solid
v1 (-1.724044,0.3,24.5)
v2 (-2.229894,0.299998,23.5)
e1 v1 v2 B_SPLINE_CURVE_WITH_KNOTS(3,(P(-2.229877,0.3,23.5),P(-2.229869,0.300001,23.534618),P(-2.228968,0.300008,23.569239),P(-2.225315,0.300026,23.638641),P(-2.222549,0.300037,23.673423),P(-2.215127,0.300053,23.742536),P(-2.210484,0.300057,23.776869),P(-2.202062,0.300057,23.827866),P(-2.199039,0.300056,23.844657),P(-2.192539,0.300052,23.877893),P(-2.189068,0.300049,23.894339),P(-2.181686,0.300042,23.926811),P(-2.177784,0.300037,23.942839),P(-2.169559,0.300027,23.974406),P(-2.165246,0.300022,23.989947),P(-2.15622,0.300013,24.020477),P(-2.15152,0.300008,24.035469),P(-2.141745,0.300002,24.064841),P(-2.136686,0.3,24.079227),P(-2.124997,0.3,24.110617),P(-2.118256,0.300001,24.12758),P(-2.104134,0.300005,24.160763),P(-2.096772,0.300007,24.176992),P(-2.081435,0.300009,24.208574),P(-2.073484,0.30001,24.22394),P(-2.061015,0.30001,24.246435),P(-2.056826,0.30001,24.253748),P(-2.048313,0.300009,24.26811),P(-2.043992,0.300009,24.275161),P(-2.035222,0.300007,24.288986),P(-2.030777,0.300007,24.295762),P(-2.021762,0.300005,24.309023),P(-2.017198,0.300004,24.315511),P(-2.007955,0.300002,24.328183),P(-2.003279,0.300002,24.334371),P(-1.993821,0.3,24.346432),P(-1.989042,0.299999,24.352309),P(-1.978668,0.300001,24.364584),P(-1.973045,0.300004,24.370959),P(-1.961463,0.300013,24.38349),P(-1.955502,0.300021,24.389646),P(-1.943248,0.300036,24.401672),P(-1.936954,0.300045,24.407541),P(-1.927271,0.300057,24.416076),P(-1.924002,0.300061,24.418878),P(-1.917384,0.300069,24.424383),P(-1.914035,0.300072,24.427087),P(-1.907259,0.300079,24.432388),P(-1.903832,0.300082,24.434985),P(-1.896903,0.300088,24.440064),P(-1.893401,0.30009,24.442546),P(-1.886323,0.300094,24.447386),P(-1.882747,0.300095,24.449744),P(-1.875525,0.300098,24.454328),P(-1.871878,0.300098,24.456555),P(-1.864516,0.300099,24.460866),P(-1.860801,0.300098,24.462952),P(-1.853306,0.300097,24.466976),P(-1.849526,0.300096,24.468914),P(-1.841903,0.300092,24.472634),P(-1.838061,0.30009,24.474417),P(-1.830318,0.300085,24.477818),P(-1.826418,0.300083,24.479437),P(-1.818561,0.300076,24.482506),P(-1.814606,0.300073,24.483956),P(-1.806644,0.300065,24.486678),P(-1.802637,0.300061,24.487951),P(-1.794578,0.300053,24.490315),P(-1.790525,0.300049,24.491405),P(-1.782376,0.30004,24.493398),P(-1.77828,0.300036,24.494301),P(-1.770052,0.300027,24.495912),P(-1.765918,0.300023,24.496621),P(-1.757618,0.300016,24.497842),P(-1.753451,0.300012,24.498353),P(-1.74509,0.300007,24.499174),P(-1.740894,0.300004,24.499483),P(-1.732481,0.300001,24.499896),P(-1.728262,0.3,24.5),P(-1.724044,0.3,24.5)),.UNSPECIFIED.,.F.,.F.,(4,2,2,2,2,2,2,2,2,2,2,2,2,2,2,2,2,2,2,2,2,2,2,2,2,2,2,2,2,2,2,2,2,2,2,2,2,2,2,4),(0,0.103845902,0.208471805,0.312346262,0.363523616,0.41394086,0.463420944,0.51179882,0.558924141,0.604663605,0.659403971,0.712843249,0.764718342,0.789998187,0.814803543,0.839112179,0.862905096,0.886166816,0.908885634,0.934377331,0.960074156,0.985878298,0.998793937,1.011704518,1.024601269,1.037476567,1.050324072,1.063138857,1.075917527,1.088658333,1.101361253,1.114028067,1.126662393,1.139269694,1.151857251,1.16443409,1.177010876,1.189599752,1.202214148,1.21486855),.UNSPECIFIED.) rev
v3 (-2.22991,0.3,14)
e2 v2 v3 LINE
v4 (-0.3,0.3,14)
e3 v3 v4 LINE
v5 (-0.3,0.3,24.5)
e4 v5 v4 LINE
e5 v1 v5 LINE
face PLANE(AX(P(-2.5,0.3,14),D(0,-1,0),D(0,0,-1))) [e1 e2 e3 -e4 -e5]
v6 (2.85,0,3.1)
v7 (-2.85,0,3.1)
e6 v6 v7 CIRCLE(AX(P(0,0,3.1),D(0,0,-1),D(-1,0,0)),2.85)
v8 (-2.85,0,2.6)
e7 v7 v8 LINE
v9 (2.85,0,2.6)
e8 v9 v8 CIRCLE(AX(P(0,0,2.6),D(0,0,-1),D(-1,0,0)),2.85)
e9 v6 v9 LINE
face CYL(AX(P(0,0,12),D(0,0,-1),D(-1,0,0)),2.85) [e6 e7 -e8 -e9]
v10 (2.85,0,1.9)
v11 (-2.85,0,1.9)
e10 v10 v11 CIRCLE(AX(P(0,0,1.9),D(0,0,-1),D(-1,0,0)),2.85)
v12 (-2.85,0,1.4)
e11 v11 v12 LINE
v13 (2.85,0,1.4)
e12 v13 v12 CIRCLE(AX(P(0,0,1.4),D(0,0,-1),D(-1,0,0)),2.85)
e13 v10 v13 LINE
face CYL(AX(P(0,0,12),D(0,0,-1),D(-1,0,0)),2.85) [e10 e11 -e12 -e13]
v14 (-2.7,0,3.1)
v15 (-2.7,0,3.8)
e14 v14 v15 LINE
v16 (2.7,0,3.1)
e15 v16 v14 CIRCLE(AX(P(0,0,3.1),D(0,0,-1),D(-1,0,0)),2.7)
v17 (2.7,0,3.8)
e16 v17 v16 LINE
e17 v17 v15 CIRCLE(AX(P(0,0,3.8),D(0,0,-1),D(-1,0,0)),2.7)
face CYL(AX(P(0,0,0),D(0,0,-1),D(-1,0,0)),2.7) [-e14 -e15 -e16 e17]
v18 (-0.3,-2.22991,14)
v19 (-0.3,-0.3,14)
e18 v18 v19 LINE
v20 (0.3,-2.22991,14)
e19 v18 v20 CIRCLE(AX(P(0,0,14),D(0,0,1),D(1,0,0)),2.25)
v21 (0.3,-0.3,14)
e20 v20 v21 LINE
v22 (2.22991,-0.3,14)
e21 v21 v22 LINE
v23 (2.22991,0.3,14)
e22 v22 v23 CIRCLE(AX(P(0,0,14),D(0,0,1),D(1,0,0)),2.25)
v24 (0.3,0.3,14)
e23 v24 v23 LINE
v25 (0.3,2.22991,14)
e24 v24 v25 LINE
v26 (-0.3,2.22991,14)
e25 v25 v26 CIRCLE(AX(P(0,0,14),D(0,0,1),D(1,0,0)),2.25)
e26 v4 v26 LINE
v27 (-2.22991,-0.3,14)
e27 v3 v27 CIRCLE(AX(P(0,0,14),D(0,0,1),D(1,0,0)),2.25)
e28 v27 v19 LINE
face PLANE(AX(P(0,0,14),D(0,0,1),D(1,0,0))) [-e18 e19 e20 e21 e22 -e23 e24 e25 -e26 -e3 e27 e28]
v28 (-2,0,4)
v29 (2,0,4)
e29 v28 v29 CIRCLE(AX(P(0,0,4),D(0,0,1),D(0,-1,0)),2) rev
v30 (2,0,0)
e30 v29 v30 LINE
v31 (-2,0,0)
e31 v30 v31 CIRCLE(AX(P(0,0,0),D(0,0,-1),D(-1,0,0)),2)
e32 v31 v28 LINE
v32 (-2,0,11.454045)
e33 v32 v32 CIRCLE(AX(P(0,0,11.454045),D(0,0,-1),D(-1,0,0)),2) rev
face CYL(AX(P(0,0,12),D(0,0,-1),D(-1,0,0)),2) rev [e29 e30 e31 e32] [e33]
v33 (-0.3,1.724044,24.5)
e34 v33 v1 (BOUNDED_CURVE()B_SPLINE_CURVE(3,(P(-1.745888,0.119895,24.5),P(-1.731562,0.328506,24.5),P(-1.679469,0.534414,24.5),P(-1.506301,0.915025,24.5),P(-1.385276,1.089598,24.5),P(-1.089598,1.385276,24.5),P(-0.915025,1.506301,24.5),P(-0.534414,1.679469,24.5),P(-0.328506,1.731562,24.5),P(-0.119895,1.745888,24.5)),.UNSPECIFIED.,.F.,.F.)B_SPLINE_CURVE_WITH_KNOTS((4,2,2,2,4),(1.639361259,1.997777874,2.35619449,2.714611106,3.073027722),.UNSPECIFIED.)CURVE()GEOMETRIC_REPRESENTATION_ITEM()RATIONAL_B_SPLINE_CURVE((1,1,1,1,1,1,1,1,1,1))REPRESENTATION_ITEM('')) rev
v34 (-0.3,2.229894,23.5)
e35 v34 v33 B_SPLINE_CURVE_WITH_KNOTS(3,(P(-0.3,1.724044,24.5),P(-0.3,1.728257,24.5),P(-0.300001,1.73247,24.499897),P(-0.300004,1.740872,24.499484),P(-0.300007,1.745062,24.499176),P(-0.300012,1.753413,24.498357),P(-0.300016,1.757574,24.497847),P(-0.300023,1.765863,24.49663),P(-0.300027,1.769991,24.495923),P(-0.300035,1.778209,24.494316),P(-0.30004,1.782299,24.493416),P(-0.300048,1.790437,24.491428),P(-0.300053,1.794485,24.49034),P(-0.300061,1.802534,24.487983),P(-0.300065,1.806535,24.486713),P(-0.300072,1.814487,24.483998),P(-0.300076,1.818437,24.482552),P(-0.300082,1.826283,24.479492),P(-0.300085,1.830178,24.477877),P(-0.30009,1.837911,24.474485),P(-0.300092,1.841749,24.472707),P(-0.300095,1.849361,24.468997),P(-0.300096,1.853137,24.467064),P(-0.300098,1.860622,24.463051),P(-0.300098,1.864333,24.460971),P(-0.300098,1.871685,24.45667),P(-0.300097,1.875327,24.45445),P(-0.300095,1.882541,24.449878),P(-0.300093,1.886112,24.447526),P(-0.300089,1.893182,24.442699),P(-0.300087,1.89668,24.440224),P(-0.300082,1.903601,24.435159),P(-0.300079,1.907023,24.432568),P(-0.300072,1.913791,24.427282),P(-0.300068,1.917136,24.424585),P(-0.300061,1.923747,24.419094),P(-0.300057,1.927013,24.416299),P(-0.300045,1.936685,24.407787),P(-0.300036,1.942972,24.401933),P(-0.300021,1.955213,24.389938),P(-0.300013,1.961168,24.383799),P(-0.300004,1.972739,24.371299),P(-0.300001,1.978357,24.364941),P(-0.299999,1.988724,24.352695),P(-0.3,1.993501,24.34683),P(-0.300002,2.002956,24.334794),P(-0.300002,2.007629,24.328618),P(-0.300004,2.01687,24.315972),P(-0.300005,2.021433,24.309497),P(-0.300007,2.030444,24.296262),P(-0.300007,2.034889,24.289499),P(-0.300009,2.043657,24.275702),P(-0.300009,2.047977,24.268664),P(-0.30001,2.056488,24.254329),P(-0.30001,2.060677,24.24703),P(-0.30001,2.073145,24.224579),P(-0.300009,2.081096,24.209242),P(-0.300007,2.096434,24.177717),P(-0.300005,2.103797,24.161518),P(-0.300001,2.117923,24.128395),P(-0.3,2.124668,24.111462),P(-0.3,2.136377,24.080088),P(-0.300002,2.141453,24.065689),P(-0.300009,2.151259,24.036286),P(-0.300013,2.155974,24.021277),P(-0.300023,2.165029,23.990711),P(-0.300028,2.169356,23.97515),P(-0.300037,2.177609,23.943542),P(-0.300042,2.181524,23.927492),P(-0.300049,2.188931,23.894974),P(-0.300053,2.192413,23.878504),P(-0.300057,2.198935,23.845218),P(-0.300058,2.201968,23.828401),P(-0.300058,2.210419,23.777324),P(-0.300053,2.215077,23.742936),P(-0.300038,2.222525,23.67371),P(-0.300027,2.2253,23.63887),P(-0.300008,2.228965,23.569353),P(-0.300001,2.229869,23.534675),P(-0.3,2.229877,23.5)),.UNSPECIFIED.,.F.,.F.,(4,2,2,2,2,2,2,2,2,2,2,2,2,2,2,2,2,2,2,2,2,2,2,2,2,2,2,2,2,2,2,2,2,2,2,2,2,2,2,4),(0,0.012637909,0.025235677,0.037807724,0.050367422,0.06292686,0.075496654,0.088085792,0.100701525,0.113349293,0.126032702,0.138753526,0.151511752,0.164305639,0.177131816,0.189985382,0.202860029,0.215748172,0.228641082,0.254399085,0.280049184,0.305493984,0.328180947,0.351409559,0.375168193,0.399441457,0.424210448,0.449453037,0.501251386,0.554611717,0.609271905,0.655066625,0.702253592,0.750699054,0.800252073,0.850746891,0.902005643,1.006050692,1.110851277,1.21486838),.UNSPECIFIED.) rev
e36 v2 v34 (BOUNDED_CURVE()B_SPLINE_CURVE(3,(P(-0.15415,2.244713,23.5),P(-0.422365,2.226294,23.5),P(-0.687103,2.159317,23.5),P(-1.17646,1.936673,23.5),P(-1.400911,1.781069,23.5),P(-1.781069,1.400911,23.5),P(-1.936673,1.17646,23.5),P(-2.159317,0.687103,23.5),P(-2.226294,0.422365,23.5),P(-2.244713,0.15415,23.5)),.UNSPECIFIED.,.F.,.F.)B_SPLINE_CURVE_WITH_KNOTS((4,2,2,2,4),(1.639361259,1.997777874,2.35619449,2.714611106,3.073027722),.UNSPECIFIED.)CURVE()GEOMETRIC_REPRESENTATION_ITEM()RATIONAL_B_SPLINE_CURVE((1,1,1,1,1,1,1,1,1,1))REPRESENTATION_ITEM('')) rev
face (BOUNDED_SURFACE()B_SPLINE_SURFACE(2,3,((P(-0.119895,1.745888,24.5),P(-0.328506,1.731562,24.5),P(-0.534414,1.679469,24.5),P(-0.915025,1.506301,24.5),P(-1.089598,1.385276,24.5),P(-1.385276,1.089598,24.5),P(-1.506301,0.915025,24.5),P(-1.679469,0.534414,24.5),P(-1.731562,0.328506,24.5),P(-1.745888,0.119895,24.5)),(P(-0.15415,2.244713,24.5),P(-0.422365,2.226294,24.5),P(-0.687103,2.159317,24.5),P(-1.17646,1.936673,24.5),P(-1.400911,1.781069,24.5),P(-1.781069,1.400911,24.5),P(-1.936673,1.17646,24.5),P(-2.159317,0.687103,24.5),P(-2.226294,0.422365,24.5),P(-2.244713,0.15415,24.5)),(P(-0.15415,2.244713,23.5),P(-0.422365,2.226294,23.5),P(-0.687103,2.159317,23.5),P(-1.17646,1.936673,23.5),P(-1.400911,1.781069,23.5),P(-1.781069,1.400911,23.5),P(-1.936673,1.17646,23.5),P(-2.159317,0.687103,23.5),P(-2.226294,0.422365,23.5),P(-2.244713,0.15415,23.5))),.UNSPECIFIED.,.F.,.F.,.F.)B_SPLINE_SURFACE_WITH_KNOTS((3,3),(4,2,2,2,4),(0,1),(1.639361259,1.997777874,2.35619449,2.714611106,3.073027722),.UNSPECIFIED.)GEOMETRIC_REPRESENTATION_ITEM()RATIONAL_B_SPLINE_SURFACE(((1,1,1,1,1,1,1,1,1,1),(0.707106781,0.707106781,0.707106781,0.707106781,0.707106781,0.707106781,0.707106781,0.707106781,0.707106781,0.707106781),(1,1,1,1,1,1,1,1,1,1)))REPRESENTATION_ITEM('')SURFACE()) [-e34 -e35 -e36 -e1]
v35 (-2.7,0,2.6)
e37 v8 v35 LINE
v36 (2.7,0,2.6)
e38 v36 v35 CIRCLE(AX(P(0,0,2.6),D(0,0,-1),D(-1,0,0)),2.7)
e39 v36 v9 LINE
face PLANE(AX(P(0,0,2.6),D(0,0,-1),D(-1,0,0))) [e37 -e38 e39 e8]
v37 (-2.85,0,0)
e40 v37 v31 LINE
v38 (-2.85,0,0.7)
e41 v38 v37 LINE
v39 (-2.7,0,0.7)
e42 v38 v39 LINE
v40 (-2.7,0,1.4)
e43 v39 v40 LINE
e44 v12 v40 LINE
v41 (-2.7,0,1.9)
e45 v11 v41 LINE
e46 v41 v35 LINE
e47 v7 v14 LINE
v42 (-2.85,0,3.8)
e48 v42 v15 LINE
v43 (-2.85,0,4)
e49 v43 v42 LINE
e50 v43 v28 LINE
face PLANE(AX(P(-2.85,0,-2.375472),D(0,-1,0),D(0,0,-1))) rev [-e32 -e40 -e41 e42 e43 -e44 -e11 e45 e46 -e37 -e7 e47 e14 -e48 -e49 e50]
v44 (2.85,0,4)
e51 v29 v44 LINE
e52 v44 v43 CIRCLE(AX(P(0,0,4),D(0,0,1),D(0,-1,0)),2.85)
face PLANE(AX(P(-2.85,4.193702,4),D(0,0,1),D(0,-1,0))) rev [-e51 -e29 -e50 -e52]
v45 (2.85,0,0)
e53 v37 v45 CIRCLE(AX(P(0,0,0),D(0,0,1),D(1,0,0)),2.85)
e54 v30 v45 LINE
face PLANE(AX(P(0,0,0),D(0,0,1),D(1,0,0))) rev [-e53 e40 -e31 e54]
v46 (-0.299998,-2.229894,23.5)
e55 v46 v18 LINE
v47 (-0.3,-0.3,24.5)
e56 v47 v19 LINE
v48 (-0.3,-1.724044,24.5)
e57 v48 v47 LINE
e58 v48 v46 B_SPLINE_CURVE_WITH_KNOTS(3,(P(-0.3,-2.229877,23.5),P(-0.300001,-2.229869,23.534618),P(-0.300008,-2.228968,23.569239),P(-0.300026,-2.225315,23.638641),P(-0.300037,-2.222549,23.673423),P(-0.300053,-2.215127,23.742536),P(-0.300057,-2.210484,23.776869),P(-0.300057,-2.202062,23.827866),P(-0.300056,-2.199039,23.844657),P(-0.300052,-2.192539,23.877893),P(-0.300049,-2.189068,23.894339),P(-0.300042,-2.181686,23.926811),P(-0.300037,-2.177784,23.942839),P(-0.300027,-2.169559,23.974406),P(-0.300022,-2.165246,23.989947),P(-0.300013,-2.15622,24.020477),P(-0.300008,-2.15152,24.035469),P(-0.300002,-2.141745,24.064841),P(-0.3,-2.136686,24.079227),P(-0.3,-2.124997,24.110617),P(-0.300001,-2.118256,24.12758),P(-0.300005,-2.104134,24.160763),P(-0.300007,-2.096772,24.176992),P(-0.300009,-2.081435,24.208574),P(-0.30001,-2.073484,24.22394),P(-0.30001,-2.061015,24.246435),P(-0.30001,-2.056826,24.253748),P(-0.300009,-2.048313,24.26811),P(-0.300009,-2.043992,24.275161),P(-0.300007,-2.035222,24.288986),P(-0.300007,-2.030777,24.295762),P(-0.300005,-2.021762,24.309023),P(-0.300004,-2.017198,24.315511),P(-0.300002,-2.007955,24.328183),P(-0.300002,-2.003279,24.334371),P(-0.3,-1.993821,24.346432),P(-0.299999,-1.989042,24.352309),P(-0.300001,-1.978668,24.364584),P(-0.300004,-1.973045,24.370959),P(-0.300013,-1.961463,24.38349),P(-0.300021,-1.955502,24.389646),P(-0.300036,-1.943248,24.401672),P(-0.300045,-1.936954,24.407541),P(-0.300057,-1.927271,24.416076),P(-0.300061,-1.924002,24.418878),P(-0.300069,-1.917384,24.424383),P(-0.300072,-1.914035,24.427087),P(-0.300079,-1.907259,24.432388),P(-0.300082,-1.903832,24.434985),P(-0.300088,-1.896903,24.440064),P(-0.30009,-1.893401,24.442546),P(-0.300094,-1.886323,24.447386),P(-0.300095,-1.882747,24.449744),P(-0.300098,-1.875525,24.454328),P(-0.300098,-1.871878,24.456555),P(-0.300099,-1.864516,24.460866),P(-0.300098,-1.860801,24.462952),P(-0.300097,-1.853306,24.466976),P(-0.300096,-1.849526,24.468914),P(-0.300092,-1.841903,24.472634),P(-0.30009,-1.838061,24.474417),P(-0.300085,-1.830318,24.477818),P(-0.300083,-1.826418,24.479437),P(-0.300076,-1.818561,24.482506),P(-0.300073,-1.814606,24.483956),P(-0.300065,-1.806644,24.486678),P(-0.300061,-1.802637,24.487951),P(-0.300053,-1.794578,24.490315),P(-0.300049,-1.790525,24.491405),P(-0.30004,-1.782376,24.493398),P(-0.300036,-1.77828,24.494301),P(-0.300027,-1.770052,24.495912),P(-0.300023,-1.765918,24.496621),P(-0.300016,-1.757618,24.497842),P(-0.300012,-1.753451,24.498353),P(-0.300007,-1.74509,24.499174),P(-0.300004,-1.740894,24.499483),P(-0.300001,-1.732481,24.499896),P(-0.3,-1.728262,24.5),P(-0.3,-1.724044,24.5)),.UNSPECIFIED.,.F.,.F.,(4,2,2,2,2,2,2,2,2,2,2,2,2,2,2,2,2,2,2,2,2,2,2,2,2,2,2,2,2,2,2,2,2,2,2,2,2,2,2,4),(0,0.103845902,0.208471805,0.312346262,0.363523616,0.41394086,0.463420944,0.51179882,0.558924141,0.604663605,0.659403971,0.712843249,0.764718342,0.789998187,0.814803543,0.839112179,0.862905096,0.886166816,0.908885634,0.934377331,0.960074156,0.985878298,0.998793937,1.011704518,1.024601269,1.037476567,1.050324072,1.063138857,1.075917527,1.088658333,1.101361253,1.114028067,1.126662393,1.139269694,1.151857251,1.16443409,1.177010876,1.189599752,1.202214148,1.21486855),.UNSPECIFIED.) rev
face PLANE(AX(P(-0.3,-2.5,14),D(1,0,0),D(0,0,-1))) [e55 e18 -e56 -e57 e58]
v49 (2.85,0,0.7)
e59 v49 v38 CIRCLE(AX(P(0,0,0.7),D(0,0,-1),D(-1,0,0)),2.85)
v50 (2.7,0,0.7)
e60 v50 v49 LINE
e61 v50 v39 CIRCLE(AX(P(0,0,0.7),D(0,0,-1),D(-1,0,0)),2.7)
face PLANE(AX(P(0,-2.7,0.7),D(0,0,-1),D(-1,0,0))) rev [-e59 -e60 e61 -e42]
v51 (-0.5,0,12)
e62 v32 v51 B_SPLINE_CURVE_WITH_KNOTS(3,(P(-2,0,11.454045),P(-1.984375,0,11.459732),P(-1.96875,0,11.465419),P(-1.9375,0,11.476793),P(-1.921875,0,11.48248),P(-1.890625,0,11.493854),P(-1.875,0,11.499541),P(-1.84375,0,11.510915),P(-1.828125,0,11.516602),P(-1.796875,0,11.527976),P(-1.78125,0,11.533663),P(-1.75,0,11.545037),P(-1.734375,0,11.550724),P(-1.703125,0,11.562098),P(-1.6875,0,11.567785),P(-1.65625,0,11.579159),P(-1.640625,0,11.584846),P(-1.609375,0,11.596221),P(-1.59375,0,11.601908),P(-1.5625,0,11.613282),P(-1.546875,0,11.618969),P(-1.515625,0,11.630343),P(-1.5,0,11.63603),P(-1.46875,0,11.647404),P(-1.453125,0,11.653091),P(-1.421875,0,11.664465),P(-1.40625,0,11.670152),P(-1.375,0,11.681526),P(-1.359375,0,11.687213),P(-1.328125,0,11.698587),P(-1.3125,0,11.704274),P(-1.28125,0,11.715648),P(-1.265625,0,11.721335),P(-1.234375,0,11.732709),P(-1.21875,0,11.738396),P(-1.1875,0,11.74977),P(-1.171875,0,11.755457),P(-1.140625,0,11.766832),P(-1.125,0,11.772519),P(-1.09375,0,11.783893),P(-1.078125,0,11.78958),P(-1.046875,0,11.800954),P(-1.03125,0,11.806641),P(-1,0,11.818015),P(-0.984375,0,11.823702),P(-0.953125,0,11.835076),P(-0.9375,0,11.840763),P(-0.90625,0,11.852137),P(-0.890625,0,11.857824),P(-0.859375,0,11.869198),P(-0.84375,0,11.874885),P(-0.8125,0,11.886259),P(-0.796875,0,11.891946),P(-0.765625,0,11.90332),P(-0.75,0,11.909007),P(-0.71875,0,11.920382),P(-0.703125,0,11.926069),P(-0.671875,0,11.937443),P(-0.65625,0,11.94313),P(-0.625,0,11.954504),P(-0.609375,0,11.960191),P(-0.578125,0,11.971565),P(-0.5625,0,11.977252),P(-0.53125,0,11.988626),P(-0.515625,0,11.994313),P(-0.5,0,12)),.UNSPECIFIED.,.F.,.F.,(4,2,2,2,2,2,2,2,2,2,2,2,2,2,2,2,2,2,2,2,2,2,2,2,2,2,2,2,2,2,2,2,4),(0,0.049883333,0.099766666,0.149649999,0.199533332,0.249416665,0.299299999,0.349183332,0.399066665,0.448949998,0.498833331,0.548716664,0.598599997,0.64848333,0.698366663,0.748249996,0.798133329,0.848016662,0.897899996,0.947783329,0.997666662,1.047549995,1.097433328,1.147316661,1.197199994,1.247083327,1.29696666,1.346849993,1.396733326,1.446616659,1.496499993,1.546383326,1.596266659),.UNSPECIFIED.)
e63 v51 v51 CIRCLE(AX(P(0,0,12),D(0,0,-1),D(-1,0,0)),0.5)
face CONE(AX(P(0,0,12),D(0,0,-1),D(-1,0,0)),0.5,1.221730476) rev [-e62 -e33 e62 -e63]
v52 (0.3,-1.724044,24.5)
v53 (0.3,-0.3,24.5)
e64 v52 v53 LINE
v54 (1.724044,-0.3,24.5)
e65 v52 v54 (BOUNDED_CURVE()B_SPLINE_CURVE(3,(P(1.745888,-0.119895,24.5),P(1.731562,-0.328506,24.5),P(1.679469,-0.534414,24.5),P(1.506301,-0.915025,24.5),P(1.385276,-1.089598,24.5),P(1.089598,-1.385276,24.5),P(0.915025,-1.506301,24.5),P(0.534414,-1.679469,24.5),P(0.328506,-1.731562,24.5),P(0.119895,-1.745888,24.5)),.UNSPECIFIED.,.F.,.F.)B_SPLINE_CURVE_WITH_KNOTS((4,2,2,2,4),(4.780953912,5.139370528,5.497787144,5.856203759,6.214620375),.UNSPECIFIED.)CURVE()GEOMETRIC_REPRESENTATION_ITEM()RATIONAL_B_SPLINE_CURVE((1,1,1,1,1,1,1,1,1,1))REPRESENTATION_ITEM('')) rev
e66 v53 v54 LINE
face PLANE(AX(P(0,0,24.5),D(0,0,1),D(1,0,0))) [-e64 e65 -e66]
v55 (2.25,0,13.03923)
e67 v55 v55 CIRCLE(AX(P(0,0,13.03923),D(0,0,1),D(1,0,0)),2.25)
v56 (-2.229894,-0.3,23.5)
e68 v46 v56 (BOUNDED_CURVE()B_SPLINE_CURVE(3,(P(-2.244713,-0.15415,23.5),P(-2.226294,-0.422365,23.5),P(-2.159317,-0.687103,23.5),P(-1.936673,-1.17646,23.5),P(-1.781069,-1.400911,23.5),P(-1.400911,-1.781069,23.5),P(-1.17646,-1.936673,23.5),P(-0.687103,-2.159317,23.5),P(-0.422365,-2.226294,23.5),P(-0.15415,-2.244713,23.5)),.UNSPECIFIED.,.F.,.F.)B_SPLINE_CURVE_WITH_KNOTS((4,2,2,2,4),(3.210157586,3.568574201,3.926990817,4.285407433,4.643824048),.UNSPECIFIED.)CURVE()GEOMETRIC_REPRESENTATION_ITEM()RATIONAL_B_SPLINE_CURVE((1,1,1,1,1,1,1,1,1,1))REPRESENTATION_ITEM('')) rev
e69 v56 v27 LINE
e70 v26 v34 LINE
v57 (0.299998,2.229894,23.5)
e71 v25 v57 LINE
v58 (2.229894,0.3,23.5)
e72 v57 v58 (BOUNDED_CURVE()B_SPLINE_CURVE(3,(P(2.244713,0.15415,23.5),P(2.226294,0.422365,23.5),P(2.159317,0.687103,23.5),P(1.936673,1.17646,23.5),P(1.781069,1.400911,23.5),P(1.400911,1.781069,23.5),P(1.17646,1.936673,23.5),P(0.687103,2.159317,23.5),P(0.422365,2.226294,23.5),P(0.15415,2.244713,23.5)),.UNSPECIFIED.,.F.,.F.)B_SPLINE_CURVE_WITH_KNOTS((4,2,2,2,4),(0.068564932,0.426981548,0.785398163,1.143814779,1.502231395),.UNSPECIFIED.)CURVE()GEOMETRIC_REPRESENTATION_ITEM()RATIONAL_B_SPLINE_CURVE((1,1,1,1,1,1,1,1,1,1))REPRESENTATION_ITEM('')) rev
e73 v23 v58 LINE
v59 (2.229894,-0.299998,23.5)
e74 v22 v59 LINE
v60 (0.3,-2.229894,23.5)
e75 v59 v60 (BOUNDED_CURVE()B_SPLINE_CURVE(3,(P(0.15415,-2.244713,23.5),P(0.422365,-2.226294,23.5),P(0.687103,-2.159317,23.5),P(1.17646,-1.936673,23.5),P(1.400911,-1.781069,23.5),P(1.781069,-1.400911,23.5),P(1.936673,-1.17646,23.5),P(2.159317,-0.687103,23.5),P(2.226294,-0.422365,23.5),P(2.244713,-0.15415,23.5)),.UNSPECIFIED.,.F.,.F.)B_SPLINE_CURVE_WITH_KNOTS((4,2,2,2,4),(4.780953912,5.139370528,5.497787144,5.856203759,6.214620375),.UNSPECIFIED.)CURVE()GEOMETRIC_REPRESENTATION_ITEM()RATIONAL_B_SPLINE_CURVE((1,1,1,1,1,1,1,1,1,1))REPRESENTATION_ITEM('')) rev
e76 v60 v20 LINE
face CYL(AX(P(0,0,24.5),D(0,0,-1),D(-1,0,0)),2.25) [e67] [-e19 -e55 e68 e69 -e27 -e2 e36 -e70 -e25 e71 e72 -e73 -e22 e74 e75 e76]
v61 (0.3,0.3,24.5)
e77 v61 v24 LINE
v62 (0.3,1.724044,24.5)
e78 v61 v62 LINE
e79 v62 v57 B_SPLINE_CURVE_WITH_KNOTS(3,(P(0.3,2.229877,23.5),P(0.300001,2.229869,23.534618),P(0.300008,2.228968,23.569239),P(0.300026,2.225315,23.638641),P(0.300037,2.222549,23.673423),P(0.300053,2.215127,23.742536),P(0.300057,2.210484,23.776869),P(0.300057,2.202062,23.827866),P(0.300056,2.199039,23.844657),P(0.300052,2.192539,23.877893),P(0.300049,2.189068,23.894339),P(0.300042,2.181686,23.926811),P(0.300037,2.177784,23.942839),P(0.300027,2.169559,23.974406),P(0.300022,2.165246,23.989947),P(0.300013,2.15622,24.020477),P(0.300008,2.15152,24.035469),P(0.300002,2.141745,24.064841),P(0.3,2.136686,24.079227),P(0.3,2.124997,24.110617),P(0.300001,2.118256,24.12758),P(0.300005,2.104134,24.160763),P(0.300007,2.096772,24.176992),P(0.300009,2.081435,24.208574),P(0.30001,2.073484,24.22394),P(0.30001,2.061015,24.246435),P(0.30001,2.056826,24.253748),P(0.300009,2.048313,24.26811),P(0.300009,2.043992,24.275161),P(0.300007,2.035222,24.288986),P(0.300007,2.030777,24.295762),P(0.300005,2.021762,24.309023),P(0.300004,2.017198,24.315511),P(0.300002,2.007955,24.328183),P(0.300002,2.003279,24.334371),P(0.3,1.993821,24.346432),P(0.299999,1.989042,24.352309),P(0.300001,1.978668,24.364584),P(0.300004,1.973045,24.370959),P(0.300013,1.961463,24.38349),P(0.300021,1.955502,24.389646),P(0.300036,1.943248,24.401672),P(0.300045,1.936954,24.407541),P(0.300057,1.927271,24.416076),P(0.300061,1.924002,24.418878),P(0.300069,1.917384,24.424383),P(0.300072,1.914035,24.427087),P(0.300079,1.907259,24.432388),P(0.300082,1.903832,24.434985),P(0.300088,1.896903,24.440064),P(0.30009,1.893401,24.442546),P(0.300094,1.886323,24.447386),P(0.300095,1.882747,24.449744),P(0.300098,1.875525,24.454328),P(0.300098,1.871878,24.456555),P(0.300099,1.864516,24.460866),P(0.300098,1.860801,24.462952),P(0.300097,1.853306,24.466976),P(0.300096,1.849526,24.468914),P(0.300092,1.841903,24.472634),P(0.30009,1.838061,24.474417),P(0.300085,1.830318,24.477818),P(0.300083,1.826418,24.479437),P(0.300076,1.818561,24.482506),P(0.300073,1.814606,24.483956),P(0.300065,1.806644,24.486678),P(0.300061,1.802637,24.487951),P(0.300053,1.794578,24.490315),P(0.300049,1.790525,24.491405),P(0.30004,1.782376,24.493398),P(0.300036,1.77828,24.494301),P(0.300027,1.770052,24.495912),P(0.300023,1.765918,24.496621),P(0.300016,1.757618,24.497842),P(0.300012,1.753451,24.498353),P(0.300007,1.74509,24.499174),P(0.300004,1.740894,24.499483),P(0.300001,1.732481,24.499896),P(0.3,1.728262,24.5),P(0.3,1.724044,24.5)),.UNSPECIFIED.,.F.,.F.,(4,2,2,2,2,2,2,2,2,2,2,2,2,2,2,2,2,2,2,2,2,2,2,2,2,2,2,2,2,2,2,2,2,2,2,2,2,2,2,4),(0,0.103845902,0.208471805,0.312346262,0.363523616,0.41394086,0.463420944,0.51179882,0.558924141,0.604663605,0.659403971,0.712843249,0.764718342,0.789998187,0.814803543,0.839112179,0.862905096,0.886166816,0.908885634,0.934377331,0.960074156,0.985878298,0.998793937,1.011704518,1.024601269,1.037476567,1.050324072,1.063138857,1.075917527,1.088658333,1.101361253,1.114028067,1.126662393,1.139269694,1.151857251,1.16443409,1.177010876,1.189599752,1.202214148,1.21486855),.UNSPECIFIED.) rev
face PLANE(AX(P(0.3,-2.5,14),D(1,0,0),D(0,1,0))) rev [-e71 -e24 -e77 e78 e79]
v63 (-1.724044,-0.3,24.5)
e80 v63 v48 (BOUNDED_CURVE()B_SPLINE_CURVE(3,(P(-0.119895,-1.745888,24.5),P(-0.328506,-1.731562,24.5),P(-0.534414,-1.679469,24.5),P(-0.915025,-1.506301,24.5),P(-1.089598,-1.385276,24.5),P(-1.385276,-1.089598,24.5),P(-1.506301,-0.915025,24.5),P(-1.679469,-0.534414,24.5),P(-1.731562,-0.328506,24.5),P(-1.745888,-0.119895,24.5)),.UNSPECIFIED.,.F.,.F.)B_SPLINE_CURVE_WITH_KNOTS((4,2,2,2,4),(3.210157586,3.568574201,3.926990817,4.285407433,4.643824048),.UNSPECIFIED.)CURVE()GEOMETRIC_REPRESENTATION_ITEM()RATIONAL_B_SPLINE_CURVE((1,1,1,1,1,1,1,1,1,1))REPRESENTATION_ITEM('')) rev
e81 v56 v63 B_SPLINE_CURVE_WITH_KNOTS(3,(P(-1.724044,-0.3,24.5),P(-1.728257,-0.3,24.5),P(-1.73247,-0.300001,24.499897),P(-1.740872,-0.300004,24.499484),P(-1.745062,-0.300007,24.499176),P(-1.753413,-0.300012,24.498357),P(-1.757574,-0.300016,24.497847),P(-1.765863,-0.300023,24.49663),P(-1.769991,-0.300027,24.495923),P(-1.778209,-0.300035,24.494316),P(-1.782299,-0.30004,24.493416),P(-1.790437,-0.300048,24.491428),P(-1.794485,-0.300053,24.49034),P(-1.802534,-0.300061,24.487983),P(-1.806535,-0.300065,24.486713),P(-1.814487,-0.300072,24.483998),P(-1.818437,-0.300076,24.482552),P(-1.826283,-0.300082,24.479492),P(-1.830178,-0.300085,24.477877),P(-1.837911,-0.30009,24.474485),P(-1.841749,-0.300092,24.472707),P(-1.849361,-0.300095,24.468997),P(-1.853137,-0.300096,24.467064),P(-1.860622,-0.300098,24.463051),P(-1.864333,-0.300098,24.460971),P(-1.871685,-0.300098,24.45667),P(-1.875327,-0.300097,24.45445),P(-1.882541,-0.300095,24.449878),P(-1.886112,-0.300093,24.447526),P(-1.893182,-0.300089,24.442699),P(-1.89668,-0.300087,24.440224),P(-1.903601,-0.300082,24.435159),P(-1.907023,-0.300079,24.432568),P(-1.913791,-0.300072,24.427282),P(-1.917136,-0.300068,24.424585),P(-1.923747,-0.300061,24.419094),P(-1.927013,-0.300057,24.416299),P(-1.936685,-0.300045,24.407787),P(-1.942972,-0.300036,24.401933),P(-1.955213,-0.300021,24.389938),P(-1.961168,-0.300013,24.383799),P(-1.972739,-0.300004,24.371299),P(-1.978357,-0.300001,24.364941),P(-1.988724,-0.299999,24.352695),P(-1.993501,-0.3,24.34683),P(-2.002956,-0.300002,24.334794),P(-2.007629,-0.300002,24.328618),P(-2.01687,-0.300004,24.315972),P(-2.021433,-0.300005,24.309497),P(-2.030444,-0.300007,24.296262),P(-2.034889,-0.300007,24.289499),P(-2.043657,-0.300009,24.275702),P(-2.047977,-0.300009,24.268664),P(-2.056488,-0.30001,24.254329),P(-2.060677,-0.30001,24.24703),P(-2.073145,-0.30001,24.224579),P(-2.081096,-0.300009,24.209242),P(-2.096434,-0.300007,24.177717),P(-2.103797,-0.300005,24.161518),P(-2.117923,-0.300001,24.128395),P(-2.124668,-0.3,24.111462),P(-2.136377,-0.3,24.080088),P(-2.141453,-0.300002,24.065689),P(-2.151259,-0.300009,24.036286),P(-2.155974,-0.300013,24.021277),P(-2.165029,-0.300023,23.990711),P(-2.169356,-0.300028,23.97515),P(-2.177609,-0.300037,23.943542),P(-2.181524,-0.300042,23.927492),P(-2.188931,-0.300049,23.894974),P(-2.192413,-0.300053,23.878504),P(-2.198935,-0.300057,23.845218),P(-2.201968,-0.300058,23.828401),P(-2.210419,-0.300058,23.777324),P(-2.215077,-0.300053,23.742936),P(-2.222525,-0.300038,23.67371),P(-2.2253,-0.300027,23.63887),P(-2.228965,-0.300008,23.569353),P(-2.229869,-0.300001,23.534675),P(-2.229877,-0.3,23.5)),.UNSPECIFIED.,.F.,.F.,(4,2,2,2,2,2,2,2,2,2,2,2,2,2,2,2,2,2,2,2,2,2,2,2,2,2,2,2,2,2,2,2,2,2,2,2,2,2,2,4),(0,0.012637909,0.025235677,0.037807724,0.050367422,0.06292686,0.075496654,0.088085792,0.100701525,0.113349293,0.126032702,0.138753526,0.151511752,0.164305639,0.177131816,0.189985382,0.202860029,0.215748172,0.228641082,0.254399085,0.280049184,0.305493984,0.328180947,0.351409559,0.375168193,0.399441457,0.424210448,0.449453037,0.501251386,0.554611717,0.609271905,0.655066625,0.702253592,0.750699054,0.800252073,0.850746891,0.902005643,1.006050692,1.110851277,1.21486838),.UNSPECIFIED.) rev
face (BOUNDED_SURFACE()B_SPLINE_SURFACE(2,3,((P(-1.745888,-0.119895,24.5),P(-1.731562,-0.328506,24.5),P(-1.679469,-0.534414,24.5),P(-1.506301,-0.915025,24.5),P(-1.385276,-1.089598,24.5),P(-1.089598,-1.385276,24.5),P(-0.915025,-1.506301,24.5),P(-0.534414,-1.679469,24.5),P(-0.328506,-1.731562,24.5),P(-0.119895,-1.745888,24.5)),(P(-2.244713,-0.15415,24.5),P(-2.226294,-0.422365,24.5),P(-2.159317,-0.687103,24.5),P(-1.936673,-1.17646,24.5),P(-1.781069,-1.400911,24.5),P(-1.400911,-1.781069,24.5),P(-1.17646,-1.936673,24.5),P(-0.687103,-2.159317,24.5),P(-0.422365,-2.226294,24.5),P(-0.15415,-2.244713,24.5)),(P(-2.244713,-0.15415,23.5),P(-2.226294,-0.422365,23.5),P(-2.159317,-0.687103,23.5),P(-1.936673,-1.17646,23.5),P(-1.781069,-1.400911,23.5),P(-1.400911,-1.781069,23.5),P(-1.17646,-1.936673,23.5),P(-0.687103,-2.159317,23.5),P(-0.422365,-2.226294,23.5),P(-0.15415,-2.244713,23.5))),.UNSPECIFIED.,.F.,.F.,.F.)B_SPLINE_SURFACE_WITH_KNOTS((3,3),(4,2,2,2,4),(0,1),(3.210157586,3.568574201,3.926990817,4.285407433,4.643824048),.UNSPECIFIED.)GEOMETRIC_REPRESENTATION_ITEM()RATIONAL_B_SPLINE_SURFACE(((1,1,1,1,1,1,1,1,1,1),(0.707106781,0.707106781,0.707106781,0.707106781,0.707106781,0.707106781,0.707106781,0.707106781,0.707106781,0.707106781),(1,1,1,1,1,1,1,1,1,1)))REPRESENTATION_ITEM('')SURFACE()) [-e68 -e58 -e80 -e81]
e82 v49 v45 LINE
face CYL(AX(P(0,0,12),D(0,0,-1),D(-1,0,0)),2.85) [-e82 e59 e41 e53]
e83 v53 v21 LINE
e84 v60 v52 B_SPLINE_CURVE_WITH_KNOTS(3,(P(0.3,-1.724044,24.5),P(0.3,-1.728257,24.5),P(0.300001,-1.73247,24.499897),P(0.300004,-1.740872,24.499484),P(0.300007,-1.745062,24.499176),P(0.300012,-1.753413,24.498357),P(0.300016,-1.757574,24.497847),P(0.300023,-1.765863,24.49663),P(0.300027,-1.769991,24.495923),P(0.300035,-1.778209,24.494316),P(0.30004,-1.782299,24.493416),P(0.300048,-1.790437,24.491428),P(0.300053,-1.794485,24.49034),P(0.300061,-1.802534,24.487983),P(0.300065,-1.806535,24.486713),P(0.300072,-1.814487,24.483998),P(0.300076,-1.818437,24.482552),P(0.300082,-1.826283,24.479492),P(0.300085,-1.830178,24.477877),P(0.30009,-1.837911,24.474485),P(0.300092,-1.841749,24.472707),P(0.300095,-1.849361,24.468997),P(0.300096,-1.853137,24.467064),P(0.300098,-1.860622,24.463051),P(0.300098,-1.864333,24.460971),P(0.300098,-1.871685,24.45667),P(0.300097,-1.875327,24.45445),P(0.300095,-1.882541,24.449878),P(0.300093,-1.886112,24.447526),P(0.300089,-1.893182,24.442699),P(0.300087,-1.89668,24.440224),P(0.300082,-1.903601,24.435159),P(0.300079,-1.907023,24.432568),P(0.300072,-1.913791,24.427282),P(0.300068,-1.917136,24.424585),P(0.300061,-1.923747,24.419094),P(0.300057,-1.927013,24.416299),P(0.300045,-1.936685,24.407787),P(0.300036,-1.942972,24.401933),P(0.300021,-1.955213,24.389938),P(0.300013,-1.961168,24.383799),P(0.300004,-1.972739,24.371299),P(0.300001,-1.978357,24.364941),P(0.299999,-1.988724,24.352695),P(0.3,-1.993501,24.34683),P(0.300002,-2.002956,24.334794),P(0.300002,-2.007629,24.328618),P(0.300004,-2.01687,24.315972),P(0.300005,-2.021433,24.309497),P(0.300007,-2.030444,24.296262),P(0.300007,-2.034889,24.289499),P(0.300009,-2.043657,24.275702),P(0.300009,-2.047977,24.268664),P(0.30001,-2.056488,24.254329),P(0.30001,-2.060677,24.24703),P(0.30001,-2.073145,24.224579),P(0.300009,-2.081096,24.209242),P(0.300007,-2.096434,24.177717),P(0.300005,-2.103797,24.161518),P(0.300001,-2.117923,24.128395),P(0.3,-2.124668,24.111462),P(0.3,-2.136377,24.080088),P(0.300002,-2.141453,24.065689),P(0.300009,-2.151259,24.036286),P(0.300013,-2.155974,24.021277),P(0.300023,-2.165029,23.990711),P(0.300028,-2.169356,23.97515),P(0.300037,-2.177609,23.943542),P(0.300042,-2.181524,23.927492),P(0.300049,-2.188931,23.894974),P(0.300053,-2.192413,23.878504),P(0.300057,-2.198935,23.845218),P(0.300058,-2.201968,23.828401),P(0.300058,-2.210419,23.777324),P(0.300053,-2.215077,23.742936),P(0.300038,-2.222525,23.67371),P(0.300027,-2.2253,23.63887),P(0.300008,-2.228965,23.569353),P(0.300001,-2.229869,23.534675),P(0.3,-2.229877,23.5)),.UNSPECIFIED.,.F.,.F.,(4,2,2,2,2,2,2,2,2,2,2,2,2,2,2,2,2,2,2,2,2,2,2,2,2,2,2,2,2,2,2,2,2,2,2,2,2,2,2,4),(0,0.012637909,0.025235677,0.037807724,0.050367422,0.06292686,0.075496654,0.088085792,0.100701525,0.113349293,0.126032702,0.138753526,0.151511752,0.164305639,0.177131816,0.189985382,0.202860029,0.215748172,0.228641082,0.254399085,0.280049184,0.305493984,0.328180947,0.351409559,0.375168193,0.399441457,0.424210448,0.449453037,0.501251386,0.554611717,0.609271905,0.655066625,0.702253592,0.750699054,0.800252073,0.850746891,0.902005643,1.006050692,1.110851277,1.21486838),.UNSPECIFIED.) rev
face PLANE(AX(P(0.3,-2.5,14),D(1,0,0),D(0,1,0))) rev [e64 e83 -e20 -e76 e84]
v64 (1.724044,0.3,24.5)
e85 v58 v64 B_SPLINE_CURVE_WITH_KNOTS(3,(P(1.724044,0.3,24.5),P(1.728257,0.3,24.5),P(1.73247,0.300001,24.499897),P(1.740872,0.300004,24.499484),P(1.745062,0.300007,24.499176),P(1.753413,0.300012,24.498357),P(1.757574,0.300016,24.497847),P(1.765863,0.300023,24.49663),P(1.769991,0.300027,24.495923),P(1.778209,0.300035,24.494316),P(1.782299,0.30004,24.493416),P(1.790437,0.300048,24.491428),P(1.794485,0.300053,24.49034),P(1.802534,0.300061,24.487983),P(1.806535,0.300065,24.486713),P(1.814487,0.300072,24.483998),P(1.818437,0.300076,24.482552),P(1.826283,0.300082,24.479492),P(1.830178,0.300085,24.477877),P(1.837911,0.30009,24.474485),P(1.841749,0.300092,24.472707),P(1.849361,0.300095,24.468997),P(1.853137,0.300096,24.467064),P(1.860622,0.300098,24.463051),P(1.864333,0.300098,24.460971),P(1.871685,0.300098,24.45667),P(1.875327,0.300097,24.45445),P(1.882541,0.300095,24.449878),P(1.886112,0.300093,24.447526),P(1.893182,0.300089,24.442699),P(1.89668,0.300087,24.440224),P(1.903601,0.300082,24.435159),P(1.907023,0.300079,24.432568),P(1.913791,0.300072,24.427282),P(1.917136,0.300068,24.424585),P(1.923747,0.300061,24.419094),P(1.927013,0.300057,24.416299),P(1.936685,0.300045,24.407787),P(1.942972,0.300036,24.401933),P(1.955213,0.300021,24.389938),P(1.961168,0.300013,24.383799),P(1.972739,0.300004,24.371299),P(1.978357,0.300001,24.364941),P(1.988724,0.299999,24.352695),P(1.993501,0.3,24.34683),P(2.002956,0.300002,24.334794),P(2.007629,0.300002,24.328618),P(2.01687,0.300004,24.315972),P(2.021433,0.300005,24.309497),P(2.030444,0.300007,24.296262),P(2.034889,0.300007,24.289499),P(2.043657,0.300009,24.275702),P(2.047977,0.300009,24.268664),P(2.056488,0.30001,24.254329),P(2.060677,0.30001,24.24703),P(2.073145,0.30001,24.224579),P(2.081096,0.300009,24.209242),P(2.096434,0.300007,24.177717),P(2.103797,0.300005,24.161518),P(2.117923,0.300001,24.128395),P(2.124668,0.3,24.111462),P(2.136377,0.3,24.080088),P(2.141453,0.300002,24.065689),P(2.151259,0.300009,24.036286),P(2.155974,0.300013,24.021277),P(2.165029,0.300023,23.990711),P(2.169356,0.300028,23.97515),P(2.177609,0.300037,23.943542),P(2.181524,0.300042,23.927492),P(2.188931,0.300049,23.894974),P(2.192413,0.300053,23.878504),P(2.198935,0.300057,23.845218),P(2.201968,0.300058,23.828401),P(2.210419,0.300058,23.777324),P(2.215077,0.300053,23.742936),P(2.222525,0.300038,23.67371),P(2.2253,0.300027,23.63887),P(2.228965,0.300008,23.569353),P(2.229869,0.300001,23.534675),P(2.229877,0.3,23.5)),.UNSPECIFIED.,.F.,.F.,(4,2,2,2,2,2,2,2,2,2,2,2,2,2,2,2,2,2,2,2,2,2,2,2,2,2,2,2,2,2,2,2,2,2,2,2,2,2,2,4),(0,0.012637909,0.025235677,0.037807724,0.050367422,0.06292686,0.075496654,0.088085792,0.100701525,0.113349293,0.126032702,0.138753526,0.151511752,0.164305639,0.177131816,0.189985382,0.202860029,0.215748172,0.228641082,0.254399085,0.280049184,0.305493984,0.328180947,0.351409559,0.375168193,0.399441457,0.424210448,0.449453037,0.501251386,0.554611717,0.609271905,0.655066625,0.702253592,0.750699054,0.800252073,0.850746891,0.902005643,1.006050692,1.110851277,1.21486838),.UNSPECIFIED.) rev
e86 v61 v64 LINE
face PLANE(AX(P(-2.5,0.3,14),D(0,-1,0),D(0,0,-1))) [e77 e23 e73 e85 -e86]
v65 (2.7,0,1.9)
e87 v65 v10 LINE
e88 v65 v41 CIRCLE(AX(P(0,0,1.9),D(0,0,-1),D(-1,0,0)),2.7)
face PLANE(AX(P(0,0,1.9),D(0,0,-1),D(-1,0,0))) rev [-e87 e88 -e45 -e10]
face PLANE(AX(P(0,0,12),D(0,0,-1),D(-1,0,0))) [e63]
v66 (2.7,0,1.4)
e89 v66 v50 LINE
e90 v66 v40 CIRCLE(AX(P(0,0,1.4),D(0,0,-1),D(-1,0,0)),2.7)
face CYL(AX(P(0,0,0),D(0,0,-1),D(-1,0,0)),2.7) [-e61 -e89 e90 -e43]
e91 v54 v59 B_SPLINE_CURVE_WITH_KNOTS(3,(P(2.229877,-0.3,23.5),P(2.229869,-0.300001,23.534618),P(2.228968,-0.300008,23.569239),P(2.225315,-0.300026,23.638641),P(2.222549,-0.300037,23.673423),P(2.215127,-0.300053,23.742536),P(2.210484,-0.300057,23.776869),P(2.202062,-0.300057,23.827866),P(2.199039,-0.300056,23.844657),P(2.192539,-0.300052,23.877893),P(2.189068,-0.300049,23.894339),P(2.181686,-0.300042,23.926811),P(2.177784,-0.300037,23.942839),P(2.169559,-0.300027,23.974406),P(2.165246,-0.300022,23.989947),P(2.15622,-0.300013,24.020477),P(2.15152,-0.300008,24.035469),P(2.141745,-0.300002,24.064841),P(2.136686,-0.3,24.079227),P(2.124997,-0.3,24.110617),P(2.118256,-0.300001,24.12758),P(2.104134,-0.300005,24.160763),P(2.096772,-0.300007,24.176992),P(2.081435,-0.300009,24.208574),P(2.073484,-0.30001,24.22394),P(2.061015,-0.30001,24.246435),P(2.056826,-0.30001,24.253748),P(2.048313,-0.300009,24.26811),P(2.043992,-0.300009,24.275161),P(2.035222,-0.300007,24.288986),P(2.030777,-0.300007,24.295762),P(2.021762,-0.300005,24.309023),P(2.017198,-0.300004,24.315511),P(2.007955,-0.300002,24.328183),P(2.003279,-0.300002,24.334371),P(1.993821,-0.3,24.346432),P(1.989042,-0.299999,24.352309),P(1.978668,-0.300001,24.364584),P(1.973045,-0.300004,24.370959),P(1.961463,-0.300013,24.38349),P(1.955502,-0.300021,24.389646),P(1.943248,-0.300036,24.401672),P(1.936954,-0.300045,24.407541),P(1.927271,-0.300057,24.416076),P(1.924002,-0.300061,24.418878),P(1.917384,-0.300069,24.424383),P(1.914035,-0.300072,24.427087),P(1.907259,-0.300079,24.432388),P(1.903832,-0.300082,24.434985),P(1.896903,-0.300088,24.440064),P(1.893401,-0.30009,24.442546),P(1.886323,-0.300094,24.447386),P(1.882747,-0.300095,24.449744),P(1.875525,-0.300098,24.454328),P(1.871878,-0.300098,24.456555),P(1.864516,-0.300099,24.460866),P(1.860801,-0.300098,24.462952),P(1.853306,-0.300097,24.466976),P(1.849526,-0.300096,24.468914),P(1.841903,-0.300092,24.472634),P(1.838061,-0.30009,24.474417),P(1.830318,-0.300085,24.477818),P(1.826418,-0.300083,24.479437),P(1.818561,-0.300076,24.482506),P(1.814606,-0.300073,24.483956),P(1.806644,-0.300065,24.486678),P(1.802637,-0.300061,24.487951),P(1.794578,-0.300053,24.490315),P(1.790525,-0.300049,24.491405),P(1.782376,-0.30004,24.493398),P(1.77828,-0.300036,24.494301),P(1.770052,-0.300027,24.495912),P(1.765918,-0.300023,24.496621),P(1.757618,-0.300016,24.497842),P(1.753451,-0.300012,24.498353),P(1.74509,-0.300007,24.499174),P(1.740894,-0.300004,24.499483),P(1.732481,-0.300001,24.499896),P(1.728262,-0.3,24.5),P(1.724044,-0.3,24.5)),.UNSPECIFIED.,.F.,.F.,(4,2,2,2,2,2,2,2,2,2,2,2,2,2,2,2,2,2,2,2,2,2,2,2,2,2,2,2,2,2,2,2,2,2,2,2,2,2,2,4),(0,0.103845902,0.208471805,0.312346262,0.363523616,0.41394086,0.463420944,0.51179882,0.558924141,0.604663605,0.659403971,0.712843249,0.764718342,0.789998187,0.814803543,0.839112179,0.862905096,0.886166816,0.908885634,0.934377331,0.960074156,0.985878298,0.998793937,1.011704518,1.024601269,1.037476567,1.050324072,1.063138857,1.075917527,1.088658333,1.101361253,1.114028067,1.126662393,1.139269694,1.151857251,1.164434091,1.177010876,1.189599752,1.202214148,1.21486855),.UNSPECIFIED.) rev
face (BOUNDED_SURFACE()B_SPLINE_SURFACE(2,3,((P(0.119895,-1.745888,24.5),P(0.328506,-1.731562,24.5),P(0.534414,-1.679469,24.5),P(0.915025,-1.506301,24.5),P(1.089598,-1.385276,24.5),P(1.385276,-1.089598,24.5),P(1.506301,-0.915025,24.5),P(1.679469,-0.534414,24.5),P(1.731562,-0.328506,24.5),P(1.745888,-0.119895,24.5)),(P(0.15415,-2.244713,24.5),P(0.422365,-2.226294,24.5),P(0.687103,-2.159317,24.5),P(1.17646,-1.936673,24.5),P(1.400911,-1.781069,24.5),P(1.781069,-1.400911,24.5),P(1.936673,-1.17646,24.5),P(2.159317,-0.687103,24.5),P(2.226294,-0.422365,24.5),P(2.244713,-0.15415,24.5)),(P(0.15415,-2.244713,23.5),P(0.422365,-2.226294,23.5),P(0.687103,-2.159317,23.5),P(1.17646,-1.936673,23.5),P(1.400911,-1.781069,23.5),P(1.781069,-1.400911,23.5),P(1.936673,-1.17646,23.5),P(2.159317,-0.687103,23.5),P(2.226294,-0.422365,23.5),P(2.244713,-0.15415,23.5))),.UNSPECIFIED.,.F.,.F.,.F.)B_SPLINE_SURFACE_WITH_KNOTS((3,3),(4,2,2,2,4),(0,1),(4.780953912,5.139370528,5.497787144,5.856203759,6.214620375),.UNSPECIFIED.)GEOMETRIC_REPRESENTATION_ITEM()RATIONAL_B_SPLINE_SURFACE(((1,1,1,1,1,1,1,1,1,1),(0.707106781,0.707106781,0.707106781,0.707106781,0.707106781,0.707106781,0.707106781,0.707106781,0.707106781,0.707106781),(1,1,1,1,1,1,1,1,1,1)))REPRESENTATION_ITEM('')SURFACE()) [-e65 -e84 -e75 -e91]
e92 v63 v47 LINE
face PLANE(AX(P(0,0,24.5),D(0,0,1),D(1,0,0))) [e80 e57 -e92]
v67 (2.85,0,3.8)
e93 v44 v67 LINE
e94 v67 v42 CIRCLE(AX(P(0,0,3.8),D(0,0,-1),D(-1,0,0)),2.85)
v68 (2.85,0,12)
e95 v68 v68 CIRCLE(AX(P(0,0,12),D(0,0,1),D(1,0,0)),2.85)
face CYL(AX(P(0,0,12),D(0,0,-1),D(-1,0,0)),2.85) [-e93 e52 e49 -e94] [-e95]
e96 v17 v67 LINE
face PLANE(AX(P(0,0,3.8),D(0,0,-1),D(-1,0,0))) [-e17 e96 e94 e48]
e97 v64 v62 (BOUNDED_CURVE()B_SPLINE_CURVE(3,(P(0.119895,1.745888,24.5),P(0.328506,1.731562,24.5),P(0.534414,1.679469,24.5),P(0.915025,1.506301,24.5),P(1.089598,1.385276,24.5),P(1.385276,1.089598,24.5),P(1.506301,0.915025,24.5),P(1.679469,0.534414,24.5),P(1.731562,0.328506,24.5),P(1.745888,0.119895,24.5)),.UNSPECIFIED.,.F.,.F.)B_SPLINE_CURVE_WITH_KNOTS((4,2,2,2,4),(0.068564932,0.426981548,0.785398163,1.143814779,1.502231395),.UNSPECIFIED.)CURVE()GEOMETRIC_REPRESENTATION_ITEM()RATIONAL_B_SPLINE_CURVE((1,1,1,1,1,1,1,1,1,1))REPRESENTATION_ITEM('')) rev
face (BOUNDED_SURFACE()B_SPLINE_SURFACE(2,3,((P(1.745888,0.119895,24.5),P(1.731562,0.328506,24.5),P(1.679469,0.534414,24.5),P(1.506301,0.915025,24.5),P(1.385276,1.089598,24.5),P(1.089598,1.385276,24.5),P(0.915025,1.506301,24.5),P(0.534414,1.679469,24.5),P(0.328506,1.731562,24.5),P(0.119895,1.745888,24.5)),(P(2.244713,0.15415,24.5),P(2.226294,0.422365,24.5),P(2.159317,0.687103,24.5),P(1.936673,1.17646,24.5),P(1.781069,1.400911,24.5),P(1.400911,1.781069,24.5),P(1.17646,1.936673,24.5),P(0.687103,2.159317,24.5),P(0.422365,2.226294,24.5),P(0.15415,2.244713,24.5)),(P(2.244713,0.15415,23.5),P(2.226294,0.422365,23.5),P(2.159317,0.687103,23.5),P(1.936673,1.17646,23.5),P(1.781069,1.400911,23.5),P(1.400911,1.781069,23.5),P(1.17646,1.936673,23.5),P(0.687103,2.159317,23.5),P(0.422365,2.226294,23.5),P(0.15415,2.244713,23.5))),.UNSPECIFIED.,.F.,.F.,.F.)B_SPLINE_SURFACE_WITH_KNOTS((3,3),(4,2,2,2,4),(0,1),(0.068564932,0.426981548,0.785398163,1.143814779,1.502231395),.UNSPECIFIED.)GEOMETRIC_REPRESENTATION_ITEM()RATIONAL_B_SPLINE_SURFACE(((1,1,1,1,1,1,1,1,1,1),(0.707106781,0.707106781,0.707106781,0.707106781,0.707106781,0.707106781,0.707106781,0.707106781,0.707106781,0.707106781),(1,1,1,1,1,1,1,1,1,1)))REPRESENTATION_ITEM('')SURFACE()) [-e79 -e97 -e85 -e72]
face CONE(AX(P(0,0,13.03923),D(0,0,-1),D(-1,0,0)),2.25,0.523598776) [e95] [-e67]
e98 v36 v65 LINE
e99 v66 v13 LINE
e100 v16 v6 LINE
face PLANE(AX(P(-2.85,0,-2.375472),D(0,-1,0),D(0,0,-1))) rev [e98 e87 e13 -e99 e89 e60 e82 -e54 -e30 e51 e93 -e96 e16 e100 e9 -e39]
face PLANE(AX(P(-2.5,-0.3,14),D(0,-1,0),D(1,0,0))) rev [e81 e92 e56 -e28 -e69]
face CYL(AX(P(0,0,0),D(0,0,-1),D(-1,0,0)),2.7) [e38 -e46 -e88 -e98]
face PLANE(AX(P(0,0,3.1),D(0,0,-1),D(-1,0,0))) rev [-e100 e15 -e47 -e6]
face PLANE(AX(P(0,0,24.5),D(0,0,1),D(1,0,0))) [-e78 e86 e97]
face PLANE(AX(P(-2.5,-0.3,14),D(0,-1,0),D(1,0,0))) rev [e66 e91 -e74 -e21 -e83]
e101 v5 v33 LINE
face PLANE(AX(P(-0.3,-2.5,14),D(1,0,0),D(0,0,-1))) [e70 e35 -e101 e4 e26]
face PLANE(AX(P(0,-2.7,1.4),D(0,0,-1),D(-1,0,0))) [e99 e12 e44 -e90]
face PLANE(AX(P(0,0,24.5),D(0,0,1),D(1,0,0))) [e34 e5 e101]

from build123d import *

# Parameters (mm, degrees)
SKETCH_1_R               = 2.85
EXTRUDE_1_DEPTH          = 12
SKETCH_2_R               = 2.25
EXTRUDE_2_DEPTH          = 12.5
SKETCH_3_R               = 2
CUT_EXTRUDE_1_DEPTH      = 12
CHAMFER_1_SIZE           = 1.5
CHAMFER_1_SIZE2          = 0.545955351
CUT_EXTRUDE_2_DEPTH      = 25.829317349
CUT_EXTRUDE_2_DEPTH_BACK = 25.829317349
SKETCH_4_W               = 6.375471686
SKETCH_4_H               = 4.193701662
SKETCH_5_W               = 0.7
SKETCH_5_H               = 0.3
CHAMFER_2_SIZE           = 0.6
CHAMFER_2_SIZE_2         = 1.039230485
SKETCH_6_W               = 0.6
SKETCH_6_H               = 5
SKETCH_6_W_2             = 5
SKETCH_6_H_2             = 0.6
CUT_EXTRUDE_3_DEPTH      = 10.5
FILLET_1_SIZE            = 1
FILLET_1_SIZE_2          = 0.5


with BuildPart() as part:
    # Эскиз1 → Бобышка-Вытянуть1 (new body)
    with BuildSketch(Plane.XY):
        Circle(SKETCH_1_R)
    extrude(amount=EXTRUDE_1_DEPTH)

    # Эскиз2 → Бобышка-Вытянуть2 (add)
    with BuildSketch(Plane.XY.offset(12)):
        Circle(SKETCH_2_R)
    extrude(amount=EXTRUDE_2_DEPTH)

    # Эскиз3 → Вырез-Вытянуть1 (cut)
    with BuildSketch(Plane(origin=(0, 0, 0), x_dir=(-1, 0, 0), z_dir=(0, 0, -1))):
        Circle(SKETCH_3_R)
    extrude(amount=-CUT_EXTRUDE_1_DEPTH, mode=Mode.SUBTRACT)

    # Фаска1
    chamfer_1_edges = [part.edges().sort_by_distance(p)[0] for p in [
        (2, 0, 12),
    ]]
    chamfer_1_side = [part.faces().sort_by_distance(p)[0] for p in [
        (0, 0, 12),
    ]]
    chamfer(chamfer_1_edges, length=CHAMFER_1_SIZE, length2=CHAMFER_1_SIZE2, reference=chamfer_1_side[0])

    # Эскиз4 → Вырез-Вытянуть2 (cut, two sides: drawn at the far end of the back side and taken through both)
    with BuildSketch(Plane(origin=(0, 0, 0), x_dir=(0, 0, -1), z_dir=(1, 0, 0)).offset(-CUT_EXTRUDE_2_DEPTH_BACK)):
        with Locations((-0.812264157, 2.096850831)):
            Rectangle(SKETCH_4_W, SKETCH_4_H)
    extrude(amount=CUT_EXTRUDE_2_DEPTH + CUT_EXTRUDE_2_DEPTH_BACK, mode=Mode.SUBTRACT)

    # Эскиз5 → Вырез-Повернуть1 (revolve, cut)
    with BuildSketch(Plane(origin=(0, 0, 0), x_dir=(0, 0, -1), z_dir=(1, 0, 0))):
        with Locations((-3.45, -2.85)):
            Rectangle(SKETCH_5_W, SKETCH_5_H)
        with Locations((-2.25, -2.85)):
            Rectangle(SKETCH_5_W, SKETCH_5_H)
        with Locations((-1.05, -2.85)):
            Rectangle(SKETCH_5_W, SKETCH_5_H)
    revolve(axis=Axis((0, 0, 0), (0, 0, 1)), mode=Mode.SUBTRACT)

    # Фаска2
    # the kernel refuses this chamfer: 1.039230485, 0.6 mm, written as the material it adds along each edge
    with BuildSketch(Plane(origin=(0, 0, 12), x_dir=(1, 0, 0), z_dir=(0, -1, 0))) as chamfer_2_piece_1_section:
        Polygon((2.25 + CHAMFER_2_SIZE, 0), (2.25, CHAMFER_2_SIZE_2), (2.25, 0), align=None)
    chamfer_2_piece_1 = revolve(axis=Axis((0, 0, 12), (0, 0, 1)), mode=Mode.PRIVATE)
    chamfer_2_piece_1 = chamfer_2_piece_1 & Plane(origin=(0, 0, 12.528833644), x_dir=(1, 0, 0), z_dir=(0, 0, -1)) * Cylinder(2.85, 12, mode=Mode.PRIVATE)
    add(chamfer_2_piece_1)

    # Эскиз6 → Вырез-Вытянуть3 (cut)
    with BuildSketch(Plane.XY.offset(24.5)):
        Rectangle(SKETCH_6_W, SKETCH_6_H)
        Rectangle(SKETCH_6_W_2, SKETCH_6_H_2)
    extrude(amount=-CUT_EXTRUDE_3_DEPTH, mode=Mode.SUBTRACT)

    # Скругление1
    # an asymmetric fillet: 1, 0.5 mm, written as the material it takes off along each edge
    with BuildSketch(Plane(origin=(0, 0, 24.5), x_dir=(0.8292066330076089, 0.5589421792781295, 0), z_dir=(0.5589421792781295, -0.8292066330076089, 0))) as fillet_1_piece_1:
        with BuildLine():
            Bezier((2.25, -FILLET_1_SIZE), (2.25, 0), (2.25 - FILLET_1_SIZE_2, 0), weights=[1, 0.707106781, 1])
            Line((2.25 - FILLET_1_SIZE_2, 0), (2.25, 0))
            Line((2.25, 0), (2.25, -FILLET_1_SIZE))
        make_face()
    revolve(axis=Axis((0, 0, 24.5), (0, 0, 1)), revolution_arc=202.034652165, mode=Mode.SUBTRACT)
    with BuildSketch(Plane(origin=(0, 0, 24.5), x_dir=(-0.5589421792781271, 0.8292066330076105, 0), z_dir=(0.8292066330076105, 0.5589421792781271, 0))) as fillet_1_piece_2:
        with BuildLine():
            Bezier((2.25, -FILLET_1_SIZE), (2.25, 0), (2.25 - FILLET_1_SIZE_2, 0), weights=[1, 0.707106781, 1])
            Line((2.25 - FILLET_1_SIZE_2, 0), (2.25, 0))
            Line((2.25, 0), (2.25, -FILLET_1_SIZE))
        make_face()
    revolve(axis=Axis((0, 0, 24.5), (0, 0, 1)), revolution_arc=202.034652165, mode=Mode.SUBTRACT)
    with BuildSketch(Plane(origin=(0, 0, 24.5), x_dir=(-0.8292066330076107, -0.5589421792781271, 0), z_dir=(-0.5589421792781271, 0.8292066330076107, 0))) as fillet_1_piece_3:
        with BuildLine():
            Bezier((2.25, -FILLET_1_SIZE), (2.25, 0), (2.25 - FILLET_1_SIZE_2, 0), weights=[1, 0.707106781, 1])
            Line((2.25 - FILLET_1_SIZE_2, 0), (2.25, 0))
            Line((2.25, 0), (2.25, -FILLET_1_SIZE))
        make_face()
    revolve(axis=Axis((0, 0, 24.5), (0, 0, 1)), revolution_arc=202.034652165, mode=Mode.SUBTRACT)
    with BuildSketch(Plane(origin=(0, 0, 24.5), x_dir=(0.5589421792781443, -0.8292066330075989, 0), z_dir=(-0.8292066330075989, -0.5589421792781443, 0))) as fillet_1_piece_4:
        with BuildLine():
            Bezier((2.25, -FILLET_1_SIZE), (2.25, 0), (2.25 - FILLET_1_SIZE_2, 0), weights=[1, 0.707106781, 1])
            Line((2.25 - FILLET_1_SIZE_2, 0), (2.25, 0))
            Line((2.25, 0), (2.25, -FILLET_1_SIZE))
        make_face()
    revolve(axis=Axis((0, 0, 24.5), (0, 0, 1)), revolution_arc=202.034652165, mode=Mode.SUBTRACT)


solid = part.part
